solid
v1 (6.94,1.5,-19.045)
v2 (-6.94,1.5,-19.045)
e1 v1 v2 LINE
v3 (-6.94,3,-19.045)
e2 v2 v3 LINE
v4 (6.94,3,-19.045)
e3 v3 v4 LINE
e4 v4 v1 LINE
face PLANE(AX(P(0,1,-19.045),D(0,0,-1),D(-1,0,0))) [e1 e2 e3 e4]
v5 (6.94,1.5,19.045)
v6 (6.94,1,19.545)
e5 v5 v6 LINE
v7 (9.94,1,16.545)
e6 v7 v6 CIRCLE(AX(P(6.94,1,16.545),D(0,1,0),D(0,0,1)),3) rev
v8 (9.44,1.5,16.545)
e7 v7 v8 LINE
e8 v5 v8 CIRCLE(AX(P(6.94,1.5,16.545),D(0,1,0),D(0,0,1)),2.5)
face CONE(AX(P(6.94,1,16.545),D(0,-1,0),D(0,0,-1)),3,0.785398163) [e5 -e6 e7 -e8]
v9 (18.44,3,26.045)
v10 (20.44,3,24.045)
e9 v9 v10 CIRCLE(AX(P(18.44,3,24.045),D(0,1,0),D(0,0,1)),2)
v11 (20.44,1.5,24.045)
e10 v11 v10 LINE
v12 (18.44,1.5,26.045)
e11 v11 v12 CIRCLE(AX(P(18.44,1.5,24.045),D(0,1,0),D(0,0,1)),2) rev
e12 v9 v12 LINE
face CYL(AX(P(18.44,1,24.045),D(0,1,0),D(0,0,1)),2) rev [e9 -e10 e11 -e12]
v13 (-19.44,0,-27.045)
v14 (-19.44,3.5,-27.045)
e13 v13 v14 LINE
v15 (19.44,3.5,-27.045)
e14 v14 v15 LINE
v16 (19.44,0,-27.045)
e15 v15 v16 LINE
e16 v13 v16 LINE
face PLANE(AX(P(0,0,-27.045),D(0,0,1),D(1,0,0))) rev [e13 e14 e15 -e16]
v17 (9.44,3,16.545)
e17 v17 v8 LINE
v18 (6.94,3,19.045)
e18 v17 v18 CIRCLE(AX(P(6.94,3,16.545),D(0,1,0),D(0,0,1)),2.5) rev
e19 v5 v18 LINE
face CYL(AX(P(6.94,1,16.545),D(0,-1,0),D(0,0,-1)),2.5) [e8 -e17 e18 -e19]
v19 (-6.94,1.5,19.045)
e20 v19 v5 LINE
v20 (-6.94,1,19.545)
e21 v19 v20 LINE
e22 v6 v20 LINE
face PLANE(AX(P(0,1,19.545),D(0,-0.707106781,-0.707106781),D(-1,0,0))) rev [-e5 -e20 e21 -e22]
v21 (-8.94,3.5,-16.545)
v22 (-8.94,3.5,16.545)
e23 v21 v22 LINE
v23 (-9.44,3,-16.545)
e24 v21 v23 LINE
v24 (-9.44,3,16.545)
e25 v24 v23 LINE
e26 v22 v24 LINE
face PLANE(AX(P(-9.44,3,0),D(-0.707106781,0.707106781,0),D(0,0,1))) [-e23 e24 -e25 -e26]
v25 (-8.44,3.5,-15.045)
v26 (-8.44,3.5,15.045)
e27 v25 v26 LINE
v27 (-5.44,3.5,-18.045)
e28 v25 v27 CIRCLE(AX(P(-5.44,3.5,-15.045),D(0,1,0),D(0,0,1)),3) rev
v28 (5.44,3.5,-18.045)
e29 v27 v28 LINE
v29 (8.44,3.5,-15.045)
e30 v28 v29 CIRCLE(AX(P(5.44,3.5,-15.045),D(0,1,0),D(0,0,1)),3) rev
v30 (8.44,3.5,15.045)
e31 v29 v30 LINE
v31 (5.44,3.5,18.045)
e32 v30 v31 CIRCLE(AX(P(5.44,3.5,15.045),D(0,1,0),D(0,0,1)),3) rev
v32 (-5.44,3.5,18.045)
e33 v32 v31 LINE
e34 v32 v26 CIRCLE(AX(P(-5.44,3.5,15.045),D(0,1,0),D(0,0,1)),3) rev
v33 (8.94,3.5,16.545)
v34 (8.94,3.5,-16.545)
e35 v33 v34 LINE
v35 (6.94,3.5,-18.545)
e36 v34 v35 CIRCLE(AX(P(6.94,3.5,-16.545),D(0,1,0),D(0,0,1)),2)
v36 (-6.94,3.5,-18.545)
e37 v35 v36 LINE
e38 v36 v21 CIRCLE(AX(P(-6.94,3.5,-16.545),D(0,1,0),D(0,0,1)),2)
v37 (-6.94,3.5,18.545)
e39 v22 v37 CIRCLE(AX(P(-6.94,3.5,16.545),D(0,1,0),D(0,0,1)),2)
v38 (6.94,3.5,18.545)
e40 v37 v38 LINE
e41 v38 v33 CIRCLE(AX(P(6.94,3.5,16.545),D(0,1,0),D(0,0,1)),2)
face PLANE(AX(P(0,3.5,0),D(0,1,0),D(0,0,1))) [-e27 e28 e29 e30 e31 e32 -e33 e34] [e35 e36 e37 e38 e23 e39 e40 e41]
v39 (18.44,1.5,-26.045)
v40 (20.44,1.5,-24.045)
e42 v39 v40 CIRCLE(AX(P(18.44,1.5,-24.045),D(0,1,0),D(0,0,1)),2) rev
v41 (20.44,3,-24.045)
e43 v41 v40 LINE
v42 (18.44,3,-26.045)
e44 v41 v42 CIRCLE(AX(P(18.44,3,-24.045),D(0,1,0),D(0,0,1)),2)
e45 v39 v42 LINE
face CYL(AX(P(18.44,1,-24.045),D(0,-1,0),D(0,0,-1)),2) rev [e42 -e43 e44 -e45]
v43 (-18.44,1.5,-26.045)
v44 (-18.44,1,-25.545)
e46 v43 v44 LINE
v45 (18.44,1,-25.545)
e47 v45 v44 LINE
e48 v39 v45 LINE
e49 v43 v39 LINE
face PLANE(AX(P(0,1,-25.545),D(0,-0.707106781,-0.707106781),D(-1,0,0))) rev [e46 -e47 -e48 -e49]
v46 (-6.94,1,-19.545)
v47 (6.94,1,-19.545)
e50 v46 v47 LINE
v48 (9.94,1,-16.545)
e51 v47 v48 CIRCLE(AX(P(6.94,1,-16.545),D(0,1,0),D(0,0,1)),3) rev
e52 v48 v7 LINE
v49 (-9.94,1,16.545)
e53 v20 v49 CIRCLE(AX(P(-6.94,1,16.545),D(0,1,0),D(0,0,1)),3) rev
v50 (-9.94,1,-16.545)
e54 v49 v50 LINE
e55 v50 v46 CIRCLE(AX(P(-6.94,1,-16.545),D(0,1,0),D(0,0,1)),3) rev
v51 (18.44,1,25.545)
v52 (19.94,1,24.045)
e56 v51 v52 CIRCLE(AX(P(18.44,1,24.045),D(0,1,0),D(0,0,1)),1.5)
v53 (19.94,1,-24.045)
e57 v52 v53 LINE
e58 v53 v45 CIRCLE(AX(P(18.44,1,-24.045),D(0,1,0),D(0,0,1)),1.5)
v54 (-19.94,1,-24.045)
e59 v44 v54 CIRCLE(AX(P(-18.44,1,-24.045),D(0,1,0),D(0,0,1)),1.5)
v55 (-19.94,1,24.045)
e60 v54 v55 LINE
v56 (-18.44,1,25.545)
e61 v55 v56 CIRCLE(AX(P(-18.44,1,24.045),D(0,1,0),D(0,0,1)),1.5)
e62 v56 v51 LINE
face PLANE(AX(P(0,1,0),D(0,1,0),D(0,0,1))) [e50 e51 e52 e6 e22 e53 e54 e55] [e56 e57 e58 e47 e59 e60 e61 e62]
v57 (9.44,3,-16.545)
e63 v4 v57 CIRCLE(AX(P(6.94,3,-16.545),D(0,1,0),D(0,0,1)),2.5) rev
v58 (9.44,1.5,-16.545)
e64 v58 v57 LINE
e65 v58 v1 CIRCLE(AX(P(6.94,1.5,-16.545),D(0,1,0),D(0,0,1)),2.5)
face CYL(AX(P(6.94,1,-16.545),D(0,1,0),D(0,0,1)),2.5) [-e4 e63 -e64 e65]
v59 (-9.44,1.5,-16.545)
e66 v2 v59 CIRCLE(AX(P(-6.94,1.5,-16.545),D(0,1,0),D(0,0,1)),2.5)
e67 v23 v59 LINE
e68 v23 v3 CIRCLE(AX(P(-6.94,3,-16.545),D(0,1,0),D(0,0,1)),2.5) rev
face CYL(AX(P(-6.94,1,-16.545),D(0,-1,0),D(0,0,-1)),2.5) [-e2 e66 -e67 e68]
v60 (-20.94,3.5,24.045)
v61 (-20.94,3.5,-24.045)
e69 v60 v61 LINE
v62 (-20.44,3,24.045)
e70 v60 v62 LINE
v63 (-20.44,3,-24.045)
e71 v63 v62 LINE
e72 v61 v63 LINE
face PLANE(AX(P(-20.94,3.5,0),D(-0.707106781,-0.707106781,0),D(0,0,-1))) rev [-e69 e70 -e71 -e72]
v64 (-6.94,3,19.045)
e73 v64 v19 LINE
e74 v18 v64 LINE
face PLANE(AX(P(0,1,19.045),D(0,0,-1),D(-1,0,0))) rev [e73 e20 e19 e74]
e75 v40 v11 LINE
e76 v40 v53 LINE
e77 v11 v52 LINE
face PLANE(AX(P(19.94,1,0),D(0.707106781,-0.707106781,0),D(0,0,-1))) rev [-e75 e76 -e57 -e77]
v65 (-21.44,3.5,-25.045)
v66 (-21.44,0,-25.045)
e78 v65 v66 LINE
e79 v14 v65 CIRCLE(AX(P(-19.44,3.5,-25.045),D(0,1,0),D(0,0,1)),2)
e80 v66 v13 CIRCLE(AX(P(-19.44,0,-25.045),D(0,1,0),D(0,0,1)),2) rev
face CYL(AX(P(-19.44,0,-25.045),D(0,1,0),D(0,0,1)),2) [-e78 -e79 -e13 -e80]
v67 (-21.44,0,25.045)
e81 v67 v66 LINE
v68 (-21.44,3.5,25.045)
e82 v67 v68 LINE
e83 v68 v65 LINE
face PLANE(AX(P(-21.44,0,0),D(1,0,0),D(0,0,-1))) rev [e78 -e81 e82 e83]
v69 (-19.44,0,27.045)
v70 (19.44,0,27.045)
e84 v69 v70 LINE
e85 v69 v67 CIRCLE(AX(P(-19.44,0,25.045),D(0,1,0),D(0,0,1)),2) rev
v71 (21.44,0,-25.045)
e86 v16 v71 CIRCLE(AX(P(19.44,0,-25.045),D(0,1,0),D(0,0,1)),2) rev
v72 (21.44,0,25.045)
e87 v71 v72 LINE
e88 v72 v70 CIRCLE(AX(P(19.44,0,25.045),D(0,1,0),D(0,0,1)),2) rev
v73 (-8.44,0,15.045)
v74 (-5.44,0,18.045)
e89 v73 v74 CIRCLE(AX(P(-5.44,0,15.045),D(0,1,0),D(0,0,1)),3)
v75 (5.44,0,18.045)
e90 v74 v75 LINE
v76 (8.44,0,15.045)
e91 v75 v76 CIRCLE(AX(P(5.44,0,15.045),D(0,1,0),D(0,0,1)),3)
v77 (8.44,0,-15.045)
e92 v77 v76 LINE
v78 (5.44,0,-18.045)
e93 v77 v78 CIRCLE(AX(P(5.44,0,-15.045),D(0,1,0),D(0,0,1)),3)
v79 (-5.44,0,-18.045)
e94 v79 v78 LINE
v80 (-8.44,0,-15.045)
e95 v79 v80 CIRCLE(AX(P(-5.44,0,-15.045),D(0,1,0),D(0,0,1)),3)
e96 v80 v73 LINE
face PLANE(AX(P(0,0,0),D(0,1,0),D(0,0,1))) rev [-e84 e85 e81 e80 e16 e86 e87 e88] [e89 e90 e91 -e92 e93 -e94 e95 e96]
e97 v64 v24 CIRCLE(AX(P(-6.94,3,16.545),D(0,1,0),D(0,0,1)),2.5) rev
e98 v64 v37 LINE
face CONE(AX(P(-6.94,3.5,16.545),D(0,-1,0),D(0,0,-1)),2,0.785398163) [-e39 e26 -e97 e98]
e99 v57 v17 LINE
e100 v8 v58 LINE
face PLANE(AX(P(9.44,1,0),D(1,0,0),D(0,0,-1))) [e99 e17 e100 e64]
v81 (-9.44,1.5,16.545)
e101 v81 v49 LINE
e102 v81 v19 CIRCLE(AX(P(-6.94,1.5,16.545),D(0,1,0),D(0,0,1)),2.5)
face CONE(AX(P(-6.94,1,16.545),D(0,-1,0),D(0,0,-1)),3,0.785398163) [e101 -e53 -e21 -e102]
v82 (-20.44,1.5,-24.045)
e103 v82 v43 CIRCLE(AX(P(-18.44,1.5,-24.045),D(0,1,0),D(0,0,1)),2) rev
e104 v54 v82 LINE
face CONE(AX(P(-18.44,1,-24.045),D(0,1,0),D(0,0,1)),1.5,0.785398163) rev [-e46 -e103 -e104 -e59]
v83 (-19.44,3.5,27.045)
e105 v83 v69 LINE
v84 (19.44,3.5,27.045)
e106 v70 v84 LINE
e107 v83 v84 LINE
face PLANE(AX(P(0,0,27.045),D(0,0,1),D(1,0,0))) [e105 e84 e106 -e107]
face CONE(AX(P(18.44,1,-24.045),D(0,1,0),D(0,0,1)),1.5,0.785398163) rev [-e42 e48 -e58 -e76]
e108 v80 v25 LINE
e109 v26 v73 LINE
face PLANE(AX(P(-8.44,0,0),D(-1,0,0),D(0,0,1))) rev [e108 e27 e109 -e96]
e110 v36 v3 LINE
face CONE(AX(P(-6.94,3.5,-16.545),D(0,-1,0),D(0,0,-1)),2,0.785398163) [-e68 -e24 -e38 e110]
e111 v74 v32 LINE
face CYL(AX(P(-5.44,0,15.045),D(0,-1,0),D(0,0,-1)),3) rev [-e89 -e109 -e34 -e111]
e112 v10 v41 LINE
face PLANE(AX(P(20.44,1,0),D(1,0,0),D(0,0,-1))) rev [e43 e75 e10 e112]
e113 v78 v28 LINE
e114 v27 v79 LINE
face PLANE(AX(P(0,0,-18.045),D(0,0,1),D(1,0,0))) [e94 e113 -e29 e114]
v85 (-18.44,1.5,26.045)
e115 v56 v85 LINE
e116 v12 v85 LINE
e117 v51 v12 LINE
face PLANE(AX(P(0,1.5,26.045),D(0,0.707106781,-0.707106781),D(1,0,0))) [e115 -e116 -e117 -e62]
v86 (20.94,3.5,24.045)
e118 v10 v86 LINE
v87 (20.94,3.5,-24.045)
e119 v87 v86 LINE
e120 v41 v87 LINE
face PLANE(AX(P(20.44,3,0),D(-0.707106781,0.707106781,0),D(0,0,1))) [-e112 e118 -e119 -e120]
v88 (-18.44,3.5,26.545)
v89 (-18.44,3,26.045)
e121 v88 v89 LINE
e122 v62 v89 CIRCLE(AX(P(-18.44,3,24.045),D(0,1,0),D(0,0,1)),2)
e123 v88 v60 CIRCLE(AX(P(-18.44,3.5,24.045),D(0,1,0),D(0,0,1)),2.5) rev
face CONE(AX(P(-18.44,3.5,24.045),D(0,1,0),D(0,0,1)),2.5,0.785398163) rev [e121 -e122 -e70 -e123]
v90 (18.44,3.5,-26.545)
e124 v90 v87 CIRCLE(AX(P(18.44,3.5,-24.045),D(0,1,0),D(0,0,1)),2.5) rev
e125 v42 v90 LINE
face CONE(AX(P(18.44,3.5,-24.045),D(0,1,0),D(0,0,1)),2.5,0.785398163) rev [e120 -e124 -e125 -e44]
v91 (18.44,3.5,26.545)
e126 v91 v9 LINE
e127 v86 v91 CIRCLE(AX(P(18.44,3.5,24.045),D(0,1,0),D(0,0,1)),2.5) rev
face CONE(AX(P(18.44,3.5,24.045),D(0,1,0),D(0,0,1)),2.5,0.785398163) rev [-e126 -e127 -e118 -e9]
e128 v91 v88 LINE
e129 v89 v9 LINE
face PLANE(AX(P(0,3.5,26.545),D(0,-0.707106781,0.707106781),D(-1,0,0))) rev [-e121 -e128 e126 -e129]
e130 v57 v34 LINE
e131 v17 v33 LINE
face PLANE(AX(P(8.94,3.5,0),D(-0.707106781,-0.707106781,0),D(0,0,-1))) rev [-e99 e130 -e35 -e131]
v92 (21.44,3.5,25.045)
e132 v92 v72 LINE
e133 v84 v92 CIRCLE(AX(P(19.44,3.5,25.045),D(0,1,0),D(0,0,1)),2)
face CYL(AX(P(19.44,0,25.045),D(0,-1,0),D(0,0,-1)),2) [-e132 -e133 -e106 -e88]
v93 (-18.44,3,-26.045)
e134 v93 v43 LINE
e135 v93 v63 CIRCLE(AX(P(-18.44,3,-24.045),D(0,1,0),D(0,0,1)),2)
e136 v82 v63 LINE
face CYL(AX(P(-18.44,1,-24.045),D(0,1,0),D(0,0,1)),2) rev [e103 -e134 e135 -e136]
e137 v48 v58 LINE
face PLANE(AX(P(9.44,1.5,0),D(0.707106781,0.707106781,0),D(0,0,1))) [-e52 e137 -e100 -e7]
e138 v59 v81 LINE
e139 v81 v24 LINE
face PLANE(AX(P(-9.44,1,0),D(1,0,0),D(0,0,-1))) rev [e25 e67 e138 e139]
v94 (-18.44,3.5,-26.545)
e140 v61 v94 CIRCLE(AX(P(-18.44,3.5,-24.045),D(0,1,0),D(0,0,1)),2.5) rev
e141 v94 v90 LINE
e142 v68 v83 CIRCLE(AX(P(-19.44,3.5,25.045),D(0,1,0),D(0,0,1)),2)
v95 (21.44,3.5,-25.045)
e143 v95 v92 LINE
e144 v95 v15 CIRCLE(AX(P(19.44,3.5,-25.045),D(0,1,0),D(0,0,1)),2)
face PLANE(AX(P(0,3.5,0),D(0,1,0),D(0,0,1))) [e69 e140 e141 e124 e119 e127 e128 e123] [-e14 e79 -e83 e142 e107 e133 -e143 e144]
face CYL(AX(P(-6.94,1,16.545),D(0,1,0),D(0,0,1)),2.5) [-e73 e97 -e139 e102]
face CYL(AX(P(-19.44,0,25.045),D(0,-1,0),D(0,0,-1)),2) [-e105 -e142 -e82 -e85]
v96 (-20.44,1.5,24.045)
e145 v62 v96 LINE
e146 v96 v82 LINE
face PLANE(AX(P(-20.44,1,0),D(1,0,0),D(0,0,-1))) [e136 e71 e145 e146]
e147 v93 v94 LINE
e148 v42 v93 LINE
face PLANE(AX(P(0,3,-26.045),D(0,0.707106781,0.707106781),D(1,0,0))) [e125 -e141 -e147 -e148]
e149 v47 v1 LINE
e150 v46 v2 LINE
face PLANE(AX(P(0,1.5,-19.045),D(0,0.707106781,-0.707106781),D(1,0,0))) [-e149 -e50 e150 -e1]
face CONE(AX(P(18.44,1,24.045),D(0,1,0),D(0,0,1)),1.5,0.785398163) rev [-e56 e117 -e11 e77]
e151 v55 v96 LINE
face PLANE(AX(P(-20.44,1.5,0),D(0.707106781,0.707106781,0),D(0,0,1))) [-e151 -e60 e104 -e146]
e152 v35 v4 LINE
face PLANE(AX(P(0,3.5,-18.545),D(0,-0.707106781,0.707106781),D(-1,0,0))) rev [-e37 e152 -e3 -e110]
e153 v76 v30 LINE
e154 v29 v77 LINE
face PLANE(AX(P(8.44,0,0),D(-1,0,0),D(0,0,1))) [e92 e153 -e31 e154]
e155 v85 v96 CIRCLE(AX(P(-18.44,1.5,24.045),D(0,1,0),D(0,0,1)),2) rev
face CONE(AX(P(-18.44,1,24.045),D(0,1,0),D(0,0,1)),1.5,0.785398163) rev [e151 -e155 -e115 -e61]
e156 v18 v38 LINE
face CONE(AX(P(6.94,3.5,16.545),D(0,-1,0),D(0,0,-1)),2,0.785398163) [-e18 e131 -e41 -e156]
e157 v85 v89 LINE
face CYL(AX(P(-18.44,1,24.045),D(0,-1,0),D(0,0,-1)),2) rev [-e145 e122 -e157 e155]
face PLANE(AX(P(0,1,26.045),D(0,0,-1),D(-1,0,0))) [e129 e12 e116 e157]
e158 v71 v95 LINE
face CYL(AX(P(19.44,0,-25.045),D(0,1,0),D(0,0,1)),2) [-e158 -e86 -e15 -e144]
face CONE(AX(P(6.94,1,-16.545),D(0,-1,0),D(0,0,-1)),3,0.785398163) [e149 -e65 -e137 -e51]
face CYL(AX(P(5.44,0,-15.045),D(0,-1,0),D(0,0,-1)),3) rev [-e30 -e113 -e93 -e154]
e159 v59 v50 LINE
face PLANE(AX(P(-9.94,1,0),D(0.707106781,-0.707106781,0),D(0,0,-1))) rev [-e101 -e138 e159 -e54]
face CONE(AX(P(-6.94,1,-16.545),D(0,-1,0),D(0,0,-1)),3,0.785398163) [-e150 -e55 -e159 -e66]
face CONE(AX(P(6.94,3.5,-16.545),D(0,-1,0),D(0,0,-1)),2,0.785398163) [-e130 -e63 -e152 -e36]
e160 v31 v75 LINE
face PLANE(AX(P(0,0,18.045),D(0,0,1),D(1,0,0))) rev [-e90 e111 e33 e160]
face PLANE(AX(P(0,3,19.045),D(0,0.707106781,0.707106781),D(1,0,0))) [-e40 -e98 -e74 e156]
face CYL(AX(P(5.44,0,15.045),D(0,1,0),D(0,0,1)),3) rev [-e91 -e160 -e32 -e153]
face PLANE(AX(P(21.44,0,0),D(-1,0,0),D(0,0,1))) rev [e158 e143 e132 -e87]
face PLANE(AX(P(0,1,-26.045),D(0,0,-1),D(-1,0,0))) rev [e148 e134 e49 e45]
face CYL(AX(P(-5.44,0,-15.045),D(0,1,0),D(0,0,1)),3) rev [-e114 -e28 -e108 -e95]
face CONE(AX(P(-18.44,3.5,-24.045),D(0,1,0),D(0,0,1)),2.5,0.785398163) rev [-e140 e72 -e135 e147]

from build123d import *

# Parameters (mm, degrees)
SKETCH1_W              = 11
SKETCH1_H              = 38.09
BOSS_EXTRUDE1_DEPTH    = 3
BOSS_EXTRUDE2_DEPTH    = 3
SKETCH3_W              = 40.88
SKETCH3_H              = 46.09
CUT_EXTRUDE1_DEPTH     = 2
MOVE_START             = 3
MOVE_FACE1_OUTLINE_W   = 42.88
MOVE_FACE1_OUTLINE_H   = 48.09
MOVE_FACE1_OUTLINE_W_2 = 40.88
MOVE_FACE1_OUTLINE_H_2 = 46.09
MOVE_FACE1_DEPTH       = 0.5
MOVE_FACE2_OUTLINE_W   = 18.88
MOVE_FACE2_OUTLINE_H   = 38.09
MOVE_FACE2_OUTLINE_W_2 = 16.88
MOVE_FACE2_OUTLINE_H_2 = 36.09
MOVE_FACE2_DEPTH       = 0.5
FILLET3_R              = 3
MOVE_FACE4_BY          = 3
MOVE_FACE5_BY          = 3
MOVE_FACE6_BY          = 3
MOVE_FACE7_BY          = 3
FILLET4_R              = 2.5
FILLET5_R              = 2
CHAMFER1_SIZE          = 0.5


# Read off the part's stored shape, not the designer's step: Move Face1, Move Face2
with BuildPart() as part:
    # Sketch1 → Boss-Extrude1 (new body)
    with BuildSketch(Plane(origin=(0, 0, 0), x_dir=(1, 0, 0), z_dir=(0, 1, 0))):
        Polygon((-9.44, 19.045), (0, 19.045), (9.44, 19.045), (9.44, -19.045), (20.44, -19.045), (20.44, 23.045), (-20.44, 23.045), (-20.44, 19.045), align=None)
        with Locations((-14.94, 0)):
            Rectangle(SKETCH1_W, SKETCH1_H)
        Polygon((9.44, -19.045), (0, -19.045), (-9.44, -19.045), (-20.44, -19.045), (-20.44, -23.045), (20.44, -23.045), (20.44, -19.045), align=None)
    extrude(amount=BOSS_EXTRUDE1_DEPTH)

    # Sketch2 → Boss-Extrude2 (add)
    with BuildSketch(Plane(origin=(0, 3, 0), x_dir=(1, 0, 0), z_dir=(0, 1, 0))):
        Polygon((20.44, 23.045), (20.44, -23.045), (21.44, -23.045), (21.44, 24.045), (-21.44, 24.045), (-21.44, 23.045), (-20.44, 23.045), align=None)
        Polygon((21.44, -23.045), (20.44, -23.045), (-20.44, -23.045), (-20.44, 23.045), (-21.44, 23.045), (-21.44, -24.045), (21.44, -24.045), align=None)
        Polygon((-8.44, 19.045), (-9.44, 19.045), (-9.44, -19.045), (8.44, -19.045), (8.44, -18.045), (-8.44, -18.045), (-8.44, 18.045), align=None)
        Polygon((9.44, 19.045), (-8.44, 19.045), (-8.44, 18.045), (8.44, 18.045), (8.44, -18.045), (8.44, -19.045), (9.44, -19.045), align=None)
    extrude(amount=-BOSS_EXTRUDE2_DEPTH)

    # Sketch3 → Cut-Extrude1 (cut)
    with BuildSketch(Plane(origin=(0, 3, 0), x_dir=(1, 0, 0), z_dir=(0, 1, 0))):
        Rectangle(SKETCH3_W, SKETCH3_H)
        Polygon((9.44, 19.045), (9.44, -18.045), (9.44, -19.045), (-9.44, -19.045), (-9.44, 18.045), (-9.44, 19.045), align=None, mode=Mode.SUBTRACT)
    extrude(amount=-CUT_EXTRUDE1_DEPTH, mode=Mode.SUBTRACT)

    # Move Face1 outline → Move Face1 (add)
    with BuildSketch(Plane(origin=(0, 0, 0), x_dir=(1, 0, 0), z_dir=(0, 1, 0)).offset(MOVE_START)):
        Rectangle(MOVE_FACE1_OUTLINE_W, MOVE_FACE1_OUTLINE_H)
        Rectangle(MOVE_FACE1_OUTLINE_W_2, MOVE_FACE1_OUTLINE_H_2, mode=Mode.SUBTRACT)
    extrude(amount=MOVE_FACE1_DEPTH)

    # Move Face2 outline → Move Face2 (add)
    with BuildSketch(Plane(origin=(0, 0, 0), x_dir=(1, 0, 0), z_dir=(0, 1, 0)).offset(MOVE_START)):
        Rectangle(MOVE_FACE2_OUTLINE_W, MOVE_FACE2_OUTLINE_H)
        Rectangle(MOVE_FACE2_OUTLINE_W_2, MOVE_FACE2_OUTLINE_H_2, mode=Mode.SUBTRACT)
    extrude(amount=MOVE_FACE2_DEPTH)

    # Fillet3
    fillet3_edges = [part.edges().sort_by_distance(p)[0] for p in [
        (-8.44, 1.75, -18.045),
        (-8.44, 1.75, 18.045),
        (8.44, 1.75, 18.045),
        (8.44, 1.75, -18.045),
    ]]
    fillet(fillet3_edges, radius=FILLET3_R)

    # Move Face4: a face moved outward by 3.0
    extrude(part.faces().sort_by_distance((0, 1.75, 24.045))[0], amount=MOVE_FACE4_BY, dir=(0, 0, 1))

    # Move Face5: a face moved outward by 3.0
    extrude(part.faces().sort_by_distance((0, 1.75, -24.045))[0], amount=MOVE_FACE5_BY, dir=(0, 0, -1))

    # Move Face6: a face moved inward by 3.0
    extrude(part.faces().sort_by_distance((0, 2.25, 23.045))[0], amount=MOVE_FACE6_BY, dir=(0, 0, 1), mode=Mode.SUBTRACT)

    # Move Face7: a face moved inward by 3.0
    extrude(part.faces().sort_by_distance((0, 2.25, -23.045))[0], amount=MOVE_FACE7_BY, dir=(0, 0, -1), mode=Mode.SUBTRACT)

    # Fillet4
    fillet4_edges = [part.edges().sort_by_distance(p)[0] for p in [
        (-9.44, 2.25, 19.045),
        (9.44, 2.25, 19.045),
        (9.44, 2.25, -19.045),
        (-9.44, 2.25, -19.045),
    ]]
    fillet(fillet4_edges, radius=FILLET4_R)

    # Fillet5
    fillet5_edges = [part.edges().sort_by_distance(p)[0] for p in [
        (-21.44, 1.75, 27.045),
        (-21.44, 1.75, -27.045),
        (21.44, 1.75, -27.045),
        (21.44, 1.75, 27.045),
        (-20.44, 2.25, 26.045),
        (-20.44, 2.25, -26.045),
        (20.44, 2.25, -26.045),
        (20.44, 2.25, 26.045),
    ]]
    fillet(fillet5_edges, radius=FILLET5_R)

    # Chamfer1
    chamfer1_edges = [part.edges().sort_by_distance(p)[0] for p in [
        (0, 3.5, 19.045),
        (0, 1, 19.045),
        (9.44, 3.5, 0),
        (0, 3.5, -19.045),
        (-9.44, 3.5, 0),
        (-8.707766953, 3.5, -18.312766953),
        (8.707766953, 3.5, -18.312766953),
        (-8.707766953, 3.5, 18.312766953),
        (8.707766953, 3.5, 18.312766953),
        (9.44, 1, 0),
        (-9.44, 1, 0),
        (0, 1, -19.045),
        (8.707766953, 1, 18.312766953),
        (-8.707766953, 1, 18.312766953),
        (8.707766953, 1, -18.312766953),
        (-8.707766953, 1, -18.312766953),
        (0, 3.5, -26.045),
        (0, 1, -26.045),
        (20.44, 3.5, 0),
        (20.44, 1, 0),
        (-20.44, 1, 0),
        (0, 1, 26.045),
        (19.854213562, 1, 25.459213562),
        (-19.854213562, 1, 25.459213562),
        (-19.854213562, 1, -25.459213562),
        (19.854213562, 1, -25.459213562),
        (-20.44, 3.5, 0),
        (0, 3.5, 26.045),
        (19.854213562, 3.5, -25.459213562),
        (-19.854213562, 3.5, -25.459213562),
        (-19.854213562, 3.5, 25.459213562),
        (19.854213562, 3.5, 25.459213562),
    ]]
    chamfer(chamfer1_edges, length=CHAMFER1_SIZE)


solid = part.part
